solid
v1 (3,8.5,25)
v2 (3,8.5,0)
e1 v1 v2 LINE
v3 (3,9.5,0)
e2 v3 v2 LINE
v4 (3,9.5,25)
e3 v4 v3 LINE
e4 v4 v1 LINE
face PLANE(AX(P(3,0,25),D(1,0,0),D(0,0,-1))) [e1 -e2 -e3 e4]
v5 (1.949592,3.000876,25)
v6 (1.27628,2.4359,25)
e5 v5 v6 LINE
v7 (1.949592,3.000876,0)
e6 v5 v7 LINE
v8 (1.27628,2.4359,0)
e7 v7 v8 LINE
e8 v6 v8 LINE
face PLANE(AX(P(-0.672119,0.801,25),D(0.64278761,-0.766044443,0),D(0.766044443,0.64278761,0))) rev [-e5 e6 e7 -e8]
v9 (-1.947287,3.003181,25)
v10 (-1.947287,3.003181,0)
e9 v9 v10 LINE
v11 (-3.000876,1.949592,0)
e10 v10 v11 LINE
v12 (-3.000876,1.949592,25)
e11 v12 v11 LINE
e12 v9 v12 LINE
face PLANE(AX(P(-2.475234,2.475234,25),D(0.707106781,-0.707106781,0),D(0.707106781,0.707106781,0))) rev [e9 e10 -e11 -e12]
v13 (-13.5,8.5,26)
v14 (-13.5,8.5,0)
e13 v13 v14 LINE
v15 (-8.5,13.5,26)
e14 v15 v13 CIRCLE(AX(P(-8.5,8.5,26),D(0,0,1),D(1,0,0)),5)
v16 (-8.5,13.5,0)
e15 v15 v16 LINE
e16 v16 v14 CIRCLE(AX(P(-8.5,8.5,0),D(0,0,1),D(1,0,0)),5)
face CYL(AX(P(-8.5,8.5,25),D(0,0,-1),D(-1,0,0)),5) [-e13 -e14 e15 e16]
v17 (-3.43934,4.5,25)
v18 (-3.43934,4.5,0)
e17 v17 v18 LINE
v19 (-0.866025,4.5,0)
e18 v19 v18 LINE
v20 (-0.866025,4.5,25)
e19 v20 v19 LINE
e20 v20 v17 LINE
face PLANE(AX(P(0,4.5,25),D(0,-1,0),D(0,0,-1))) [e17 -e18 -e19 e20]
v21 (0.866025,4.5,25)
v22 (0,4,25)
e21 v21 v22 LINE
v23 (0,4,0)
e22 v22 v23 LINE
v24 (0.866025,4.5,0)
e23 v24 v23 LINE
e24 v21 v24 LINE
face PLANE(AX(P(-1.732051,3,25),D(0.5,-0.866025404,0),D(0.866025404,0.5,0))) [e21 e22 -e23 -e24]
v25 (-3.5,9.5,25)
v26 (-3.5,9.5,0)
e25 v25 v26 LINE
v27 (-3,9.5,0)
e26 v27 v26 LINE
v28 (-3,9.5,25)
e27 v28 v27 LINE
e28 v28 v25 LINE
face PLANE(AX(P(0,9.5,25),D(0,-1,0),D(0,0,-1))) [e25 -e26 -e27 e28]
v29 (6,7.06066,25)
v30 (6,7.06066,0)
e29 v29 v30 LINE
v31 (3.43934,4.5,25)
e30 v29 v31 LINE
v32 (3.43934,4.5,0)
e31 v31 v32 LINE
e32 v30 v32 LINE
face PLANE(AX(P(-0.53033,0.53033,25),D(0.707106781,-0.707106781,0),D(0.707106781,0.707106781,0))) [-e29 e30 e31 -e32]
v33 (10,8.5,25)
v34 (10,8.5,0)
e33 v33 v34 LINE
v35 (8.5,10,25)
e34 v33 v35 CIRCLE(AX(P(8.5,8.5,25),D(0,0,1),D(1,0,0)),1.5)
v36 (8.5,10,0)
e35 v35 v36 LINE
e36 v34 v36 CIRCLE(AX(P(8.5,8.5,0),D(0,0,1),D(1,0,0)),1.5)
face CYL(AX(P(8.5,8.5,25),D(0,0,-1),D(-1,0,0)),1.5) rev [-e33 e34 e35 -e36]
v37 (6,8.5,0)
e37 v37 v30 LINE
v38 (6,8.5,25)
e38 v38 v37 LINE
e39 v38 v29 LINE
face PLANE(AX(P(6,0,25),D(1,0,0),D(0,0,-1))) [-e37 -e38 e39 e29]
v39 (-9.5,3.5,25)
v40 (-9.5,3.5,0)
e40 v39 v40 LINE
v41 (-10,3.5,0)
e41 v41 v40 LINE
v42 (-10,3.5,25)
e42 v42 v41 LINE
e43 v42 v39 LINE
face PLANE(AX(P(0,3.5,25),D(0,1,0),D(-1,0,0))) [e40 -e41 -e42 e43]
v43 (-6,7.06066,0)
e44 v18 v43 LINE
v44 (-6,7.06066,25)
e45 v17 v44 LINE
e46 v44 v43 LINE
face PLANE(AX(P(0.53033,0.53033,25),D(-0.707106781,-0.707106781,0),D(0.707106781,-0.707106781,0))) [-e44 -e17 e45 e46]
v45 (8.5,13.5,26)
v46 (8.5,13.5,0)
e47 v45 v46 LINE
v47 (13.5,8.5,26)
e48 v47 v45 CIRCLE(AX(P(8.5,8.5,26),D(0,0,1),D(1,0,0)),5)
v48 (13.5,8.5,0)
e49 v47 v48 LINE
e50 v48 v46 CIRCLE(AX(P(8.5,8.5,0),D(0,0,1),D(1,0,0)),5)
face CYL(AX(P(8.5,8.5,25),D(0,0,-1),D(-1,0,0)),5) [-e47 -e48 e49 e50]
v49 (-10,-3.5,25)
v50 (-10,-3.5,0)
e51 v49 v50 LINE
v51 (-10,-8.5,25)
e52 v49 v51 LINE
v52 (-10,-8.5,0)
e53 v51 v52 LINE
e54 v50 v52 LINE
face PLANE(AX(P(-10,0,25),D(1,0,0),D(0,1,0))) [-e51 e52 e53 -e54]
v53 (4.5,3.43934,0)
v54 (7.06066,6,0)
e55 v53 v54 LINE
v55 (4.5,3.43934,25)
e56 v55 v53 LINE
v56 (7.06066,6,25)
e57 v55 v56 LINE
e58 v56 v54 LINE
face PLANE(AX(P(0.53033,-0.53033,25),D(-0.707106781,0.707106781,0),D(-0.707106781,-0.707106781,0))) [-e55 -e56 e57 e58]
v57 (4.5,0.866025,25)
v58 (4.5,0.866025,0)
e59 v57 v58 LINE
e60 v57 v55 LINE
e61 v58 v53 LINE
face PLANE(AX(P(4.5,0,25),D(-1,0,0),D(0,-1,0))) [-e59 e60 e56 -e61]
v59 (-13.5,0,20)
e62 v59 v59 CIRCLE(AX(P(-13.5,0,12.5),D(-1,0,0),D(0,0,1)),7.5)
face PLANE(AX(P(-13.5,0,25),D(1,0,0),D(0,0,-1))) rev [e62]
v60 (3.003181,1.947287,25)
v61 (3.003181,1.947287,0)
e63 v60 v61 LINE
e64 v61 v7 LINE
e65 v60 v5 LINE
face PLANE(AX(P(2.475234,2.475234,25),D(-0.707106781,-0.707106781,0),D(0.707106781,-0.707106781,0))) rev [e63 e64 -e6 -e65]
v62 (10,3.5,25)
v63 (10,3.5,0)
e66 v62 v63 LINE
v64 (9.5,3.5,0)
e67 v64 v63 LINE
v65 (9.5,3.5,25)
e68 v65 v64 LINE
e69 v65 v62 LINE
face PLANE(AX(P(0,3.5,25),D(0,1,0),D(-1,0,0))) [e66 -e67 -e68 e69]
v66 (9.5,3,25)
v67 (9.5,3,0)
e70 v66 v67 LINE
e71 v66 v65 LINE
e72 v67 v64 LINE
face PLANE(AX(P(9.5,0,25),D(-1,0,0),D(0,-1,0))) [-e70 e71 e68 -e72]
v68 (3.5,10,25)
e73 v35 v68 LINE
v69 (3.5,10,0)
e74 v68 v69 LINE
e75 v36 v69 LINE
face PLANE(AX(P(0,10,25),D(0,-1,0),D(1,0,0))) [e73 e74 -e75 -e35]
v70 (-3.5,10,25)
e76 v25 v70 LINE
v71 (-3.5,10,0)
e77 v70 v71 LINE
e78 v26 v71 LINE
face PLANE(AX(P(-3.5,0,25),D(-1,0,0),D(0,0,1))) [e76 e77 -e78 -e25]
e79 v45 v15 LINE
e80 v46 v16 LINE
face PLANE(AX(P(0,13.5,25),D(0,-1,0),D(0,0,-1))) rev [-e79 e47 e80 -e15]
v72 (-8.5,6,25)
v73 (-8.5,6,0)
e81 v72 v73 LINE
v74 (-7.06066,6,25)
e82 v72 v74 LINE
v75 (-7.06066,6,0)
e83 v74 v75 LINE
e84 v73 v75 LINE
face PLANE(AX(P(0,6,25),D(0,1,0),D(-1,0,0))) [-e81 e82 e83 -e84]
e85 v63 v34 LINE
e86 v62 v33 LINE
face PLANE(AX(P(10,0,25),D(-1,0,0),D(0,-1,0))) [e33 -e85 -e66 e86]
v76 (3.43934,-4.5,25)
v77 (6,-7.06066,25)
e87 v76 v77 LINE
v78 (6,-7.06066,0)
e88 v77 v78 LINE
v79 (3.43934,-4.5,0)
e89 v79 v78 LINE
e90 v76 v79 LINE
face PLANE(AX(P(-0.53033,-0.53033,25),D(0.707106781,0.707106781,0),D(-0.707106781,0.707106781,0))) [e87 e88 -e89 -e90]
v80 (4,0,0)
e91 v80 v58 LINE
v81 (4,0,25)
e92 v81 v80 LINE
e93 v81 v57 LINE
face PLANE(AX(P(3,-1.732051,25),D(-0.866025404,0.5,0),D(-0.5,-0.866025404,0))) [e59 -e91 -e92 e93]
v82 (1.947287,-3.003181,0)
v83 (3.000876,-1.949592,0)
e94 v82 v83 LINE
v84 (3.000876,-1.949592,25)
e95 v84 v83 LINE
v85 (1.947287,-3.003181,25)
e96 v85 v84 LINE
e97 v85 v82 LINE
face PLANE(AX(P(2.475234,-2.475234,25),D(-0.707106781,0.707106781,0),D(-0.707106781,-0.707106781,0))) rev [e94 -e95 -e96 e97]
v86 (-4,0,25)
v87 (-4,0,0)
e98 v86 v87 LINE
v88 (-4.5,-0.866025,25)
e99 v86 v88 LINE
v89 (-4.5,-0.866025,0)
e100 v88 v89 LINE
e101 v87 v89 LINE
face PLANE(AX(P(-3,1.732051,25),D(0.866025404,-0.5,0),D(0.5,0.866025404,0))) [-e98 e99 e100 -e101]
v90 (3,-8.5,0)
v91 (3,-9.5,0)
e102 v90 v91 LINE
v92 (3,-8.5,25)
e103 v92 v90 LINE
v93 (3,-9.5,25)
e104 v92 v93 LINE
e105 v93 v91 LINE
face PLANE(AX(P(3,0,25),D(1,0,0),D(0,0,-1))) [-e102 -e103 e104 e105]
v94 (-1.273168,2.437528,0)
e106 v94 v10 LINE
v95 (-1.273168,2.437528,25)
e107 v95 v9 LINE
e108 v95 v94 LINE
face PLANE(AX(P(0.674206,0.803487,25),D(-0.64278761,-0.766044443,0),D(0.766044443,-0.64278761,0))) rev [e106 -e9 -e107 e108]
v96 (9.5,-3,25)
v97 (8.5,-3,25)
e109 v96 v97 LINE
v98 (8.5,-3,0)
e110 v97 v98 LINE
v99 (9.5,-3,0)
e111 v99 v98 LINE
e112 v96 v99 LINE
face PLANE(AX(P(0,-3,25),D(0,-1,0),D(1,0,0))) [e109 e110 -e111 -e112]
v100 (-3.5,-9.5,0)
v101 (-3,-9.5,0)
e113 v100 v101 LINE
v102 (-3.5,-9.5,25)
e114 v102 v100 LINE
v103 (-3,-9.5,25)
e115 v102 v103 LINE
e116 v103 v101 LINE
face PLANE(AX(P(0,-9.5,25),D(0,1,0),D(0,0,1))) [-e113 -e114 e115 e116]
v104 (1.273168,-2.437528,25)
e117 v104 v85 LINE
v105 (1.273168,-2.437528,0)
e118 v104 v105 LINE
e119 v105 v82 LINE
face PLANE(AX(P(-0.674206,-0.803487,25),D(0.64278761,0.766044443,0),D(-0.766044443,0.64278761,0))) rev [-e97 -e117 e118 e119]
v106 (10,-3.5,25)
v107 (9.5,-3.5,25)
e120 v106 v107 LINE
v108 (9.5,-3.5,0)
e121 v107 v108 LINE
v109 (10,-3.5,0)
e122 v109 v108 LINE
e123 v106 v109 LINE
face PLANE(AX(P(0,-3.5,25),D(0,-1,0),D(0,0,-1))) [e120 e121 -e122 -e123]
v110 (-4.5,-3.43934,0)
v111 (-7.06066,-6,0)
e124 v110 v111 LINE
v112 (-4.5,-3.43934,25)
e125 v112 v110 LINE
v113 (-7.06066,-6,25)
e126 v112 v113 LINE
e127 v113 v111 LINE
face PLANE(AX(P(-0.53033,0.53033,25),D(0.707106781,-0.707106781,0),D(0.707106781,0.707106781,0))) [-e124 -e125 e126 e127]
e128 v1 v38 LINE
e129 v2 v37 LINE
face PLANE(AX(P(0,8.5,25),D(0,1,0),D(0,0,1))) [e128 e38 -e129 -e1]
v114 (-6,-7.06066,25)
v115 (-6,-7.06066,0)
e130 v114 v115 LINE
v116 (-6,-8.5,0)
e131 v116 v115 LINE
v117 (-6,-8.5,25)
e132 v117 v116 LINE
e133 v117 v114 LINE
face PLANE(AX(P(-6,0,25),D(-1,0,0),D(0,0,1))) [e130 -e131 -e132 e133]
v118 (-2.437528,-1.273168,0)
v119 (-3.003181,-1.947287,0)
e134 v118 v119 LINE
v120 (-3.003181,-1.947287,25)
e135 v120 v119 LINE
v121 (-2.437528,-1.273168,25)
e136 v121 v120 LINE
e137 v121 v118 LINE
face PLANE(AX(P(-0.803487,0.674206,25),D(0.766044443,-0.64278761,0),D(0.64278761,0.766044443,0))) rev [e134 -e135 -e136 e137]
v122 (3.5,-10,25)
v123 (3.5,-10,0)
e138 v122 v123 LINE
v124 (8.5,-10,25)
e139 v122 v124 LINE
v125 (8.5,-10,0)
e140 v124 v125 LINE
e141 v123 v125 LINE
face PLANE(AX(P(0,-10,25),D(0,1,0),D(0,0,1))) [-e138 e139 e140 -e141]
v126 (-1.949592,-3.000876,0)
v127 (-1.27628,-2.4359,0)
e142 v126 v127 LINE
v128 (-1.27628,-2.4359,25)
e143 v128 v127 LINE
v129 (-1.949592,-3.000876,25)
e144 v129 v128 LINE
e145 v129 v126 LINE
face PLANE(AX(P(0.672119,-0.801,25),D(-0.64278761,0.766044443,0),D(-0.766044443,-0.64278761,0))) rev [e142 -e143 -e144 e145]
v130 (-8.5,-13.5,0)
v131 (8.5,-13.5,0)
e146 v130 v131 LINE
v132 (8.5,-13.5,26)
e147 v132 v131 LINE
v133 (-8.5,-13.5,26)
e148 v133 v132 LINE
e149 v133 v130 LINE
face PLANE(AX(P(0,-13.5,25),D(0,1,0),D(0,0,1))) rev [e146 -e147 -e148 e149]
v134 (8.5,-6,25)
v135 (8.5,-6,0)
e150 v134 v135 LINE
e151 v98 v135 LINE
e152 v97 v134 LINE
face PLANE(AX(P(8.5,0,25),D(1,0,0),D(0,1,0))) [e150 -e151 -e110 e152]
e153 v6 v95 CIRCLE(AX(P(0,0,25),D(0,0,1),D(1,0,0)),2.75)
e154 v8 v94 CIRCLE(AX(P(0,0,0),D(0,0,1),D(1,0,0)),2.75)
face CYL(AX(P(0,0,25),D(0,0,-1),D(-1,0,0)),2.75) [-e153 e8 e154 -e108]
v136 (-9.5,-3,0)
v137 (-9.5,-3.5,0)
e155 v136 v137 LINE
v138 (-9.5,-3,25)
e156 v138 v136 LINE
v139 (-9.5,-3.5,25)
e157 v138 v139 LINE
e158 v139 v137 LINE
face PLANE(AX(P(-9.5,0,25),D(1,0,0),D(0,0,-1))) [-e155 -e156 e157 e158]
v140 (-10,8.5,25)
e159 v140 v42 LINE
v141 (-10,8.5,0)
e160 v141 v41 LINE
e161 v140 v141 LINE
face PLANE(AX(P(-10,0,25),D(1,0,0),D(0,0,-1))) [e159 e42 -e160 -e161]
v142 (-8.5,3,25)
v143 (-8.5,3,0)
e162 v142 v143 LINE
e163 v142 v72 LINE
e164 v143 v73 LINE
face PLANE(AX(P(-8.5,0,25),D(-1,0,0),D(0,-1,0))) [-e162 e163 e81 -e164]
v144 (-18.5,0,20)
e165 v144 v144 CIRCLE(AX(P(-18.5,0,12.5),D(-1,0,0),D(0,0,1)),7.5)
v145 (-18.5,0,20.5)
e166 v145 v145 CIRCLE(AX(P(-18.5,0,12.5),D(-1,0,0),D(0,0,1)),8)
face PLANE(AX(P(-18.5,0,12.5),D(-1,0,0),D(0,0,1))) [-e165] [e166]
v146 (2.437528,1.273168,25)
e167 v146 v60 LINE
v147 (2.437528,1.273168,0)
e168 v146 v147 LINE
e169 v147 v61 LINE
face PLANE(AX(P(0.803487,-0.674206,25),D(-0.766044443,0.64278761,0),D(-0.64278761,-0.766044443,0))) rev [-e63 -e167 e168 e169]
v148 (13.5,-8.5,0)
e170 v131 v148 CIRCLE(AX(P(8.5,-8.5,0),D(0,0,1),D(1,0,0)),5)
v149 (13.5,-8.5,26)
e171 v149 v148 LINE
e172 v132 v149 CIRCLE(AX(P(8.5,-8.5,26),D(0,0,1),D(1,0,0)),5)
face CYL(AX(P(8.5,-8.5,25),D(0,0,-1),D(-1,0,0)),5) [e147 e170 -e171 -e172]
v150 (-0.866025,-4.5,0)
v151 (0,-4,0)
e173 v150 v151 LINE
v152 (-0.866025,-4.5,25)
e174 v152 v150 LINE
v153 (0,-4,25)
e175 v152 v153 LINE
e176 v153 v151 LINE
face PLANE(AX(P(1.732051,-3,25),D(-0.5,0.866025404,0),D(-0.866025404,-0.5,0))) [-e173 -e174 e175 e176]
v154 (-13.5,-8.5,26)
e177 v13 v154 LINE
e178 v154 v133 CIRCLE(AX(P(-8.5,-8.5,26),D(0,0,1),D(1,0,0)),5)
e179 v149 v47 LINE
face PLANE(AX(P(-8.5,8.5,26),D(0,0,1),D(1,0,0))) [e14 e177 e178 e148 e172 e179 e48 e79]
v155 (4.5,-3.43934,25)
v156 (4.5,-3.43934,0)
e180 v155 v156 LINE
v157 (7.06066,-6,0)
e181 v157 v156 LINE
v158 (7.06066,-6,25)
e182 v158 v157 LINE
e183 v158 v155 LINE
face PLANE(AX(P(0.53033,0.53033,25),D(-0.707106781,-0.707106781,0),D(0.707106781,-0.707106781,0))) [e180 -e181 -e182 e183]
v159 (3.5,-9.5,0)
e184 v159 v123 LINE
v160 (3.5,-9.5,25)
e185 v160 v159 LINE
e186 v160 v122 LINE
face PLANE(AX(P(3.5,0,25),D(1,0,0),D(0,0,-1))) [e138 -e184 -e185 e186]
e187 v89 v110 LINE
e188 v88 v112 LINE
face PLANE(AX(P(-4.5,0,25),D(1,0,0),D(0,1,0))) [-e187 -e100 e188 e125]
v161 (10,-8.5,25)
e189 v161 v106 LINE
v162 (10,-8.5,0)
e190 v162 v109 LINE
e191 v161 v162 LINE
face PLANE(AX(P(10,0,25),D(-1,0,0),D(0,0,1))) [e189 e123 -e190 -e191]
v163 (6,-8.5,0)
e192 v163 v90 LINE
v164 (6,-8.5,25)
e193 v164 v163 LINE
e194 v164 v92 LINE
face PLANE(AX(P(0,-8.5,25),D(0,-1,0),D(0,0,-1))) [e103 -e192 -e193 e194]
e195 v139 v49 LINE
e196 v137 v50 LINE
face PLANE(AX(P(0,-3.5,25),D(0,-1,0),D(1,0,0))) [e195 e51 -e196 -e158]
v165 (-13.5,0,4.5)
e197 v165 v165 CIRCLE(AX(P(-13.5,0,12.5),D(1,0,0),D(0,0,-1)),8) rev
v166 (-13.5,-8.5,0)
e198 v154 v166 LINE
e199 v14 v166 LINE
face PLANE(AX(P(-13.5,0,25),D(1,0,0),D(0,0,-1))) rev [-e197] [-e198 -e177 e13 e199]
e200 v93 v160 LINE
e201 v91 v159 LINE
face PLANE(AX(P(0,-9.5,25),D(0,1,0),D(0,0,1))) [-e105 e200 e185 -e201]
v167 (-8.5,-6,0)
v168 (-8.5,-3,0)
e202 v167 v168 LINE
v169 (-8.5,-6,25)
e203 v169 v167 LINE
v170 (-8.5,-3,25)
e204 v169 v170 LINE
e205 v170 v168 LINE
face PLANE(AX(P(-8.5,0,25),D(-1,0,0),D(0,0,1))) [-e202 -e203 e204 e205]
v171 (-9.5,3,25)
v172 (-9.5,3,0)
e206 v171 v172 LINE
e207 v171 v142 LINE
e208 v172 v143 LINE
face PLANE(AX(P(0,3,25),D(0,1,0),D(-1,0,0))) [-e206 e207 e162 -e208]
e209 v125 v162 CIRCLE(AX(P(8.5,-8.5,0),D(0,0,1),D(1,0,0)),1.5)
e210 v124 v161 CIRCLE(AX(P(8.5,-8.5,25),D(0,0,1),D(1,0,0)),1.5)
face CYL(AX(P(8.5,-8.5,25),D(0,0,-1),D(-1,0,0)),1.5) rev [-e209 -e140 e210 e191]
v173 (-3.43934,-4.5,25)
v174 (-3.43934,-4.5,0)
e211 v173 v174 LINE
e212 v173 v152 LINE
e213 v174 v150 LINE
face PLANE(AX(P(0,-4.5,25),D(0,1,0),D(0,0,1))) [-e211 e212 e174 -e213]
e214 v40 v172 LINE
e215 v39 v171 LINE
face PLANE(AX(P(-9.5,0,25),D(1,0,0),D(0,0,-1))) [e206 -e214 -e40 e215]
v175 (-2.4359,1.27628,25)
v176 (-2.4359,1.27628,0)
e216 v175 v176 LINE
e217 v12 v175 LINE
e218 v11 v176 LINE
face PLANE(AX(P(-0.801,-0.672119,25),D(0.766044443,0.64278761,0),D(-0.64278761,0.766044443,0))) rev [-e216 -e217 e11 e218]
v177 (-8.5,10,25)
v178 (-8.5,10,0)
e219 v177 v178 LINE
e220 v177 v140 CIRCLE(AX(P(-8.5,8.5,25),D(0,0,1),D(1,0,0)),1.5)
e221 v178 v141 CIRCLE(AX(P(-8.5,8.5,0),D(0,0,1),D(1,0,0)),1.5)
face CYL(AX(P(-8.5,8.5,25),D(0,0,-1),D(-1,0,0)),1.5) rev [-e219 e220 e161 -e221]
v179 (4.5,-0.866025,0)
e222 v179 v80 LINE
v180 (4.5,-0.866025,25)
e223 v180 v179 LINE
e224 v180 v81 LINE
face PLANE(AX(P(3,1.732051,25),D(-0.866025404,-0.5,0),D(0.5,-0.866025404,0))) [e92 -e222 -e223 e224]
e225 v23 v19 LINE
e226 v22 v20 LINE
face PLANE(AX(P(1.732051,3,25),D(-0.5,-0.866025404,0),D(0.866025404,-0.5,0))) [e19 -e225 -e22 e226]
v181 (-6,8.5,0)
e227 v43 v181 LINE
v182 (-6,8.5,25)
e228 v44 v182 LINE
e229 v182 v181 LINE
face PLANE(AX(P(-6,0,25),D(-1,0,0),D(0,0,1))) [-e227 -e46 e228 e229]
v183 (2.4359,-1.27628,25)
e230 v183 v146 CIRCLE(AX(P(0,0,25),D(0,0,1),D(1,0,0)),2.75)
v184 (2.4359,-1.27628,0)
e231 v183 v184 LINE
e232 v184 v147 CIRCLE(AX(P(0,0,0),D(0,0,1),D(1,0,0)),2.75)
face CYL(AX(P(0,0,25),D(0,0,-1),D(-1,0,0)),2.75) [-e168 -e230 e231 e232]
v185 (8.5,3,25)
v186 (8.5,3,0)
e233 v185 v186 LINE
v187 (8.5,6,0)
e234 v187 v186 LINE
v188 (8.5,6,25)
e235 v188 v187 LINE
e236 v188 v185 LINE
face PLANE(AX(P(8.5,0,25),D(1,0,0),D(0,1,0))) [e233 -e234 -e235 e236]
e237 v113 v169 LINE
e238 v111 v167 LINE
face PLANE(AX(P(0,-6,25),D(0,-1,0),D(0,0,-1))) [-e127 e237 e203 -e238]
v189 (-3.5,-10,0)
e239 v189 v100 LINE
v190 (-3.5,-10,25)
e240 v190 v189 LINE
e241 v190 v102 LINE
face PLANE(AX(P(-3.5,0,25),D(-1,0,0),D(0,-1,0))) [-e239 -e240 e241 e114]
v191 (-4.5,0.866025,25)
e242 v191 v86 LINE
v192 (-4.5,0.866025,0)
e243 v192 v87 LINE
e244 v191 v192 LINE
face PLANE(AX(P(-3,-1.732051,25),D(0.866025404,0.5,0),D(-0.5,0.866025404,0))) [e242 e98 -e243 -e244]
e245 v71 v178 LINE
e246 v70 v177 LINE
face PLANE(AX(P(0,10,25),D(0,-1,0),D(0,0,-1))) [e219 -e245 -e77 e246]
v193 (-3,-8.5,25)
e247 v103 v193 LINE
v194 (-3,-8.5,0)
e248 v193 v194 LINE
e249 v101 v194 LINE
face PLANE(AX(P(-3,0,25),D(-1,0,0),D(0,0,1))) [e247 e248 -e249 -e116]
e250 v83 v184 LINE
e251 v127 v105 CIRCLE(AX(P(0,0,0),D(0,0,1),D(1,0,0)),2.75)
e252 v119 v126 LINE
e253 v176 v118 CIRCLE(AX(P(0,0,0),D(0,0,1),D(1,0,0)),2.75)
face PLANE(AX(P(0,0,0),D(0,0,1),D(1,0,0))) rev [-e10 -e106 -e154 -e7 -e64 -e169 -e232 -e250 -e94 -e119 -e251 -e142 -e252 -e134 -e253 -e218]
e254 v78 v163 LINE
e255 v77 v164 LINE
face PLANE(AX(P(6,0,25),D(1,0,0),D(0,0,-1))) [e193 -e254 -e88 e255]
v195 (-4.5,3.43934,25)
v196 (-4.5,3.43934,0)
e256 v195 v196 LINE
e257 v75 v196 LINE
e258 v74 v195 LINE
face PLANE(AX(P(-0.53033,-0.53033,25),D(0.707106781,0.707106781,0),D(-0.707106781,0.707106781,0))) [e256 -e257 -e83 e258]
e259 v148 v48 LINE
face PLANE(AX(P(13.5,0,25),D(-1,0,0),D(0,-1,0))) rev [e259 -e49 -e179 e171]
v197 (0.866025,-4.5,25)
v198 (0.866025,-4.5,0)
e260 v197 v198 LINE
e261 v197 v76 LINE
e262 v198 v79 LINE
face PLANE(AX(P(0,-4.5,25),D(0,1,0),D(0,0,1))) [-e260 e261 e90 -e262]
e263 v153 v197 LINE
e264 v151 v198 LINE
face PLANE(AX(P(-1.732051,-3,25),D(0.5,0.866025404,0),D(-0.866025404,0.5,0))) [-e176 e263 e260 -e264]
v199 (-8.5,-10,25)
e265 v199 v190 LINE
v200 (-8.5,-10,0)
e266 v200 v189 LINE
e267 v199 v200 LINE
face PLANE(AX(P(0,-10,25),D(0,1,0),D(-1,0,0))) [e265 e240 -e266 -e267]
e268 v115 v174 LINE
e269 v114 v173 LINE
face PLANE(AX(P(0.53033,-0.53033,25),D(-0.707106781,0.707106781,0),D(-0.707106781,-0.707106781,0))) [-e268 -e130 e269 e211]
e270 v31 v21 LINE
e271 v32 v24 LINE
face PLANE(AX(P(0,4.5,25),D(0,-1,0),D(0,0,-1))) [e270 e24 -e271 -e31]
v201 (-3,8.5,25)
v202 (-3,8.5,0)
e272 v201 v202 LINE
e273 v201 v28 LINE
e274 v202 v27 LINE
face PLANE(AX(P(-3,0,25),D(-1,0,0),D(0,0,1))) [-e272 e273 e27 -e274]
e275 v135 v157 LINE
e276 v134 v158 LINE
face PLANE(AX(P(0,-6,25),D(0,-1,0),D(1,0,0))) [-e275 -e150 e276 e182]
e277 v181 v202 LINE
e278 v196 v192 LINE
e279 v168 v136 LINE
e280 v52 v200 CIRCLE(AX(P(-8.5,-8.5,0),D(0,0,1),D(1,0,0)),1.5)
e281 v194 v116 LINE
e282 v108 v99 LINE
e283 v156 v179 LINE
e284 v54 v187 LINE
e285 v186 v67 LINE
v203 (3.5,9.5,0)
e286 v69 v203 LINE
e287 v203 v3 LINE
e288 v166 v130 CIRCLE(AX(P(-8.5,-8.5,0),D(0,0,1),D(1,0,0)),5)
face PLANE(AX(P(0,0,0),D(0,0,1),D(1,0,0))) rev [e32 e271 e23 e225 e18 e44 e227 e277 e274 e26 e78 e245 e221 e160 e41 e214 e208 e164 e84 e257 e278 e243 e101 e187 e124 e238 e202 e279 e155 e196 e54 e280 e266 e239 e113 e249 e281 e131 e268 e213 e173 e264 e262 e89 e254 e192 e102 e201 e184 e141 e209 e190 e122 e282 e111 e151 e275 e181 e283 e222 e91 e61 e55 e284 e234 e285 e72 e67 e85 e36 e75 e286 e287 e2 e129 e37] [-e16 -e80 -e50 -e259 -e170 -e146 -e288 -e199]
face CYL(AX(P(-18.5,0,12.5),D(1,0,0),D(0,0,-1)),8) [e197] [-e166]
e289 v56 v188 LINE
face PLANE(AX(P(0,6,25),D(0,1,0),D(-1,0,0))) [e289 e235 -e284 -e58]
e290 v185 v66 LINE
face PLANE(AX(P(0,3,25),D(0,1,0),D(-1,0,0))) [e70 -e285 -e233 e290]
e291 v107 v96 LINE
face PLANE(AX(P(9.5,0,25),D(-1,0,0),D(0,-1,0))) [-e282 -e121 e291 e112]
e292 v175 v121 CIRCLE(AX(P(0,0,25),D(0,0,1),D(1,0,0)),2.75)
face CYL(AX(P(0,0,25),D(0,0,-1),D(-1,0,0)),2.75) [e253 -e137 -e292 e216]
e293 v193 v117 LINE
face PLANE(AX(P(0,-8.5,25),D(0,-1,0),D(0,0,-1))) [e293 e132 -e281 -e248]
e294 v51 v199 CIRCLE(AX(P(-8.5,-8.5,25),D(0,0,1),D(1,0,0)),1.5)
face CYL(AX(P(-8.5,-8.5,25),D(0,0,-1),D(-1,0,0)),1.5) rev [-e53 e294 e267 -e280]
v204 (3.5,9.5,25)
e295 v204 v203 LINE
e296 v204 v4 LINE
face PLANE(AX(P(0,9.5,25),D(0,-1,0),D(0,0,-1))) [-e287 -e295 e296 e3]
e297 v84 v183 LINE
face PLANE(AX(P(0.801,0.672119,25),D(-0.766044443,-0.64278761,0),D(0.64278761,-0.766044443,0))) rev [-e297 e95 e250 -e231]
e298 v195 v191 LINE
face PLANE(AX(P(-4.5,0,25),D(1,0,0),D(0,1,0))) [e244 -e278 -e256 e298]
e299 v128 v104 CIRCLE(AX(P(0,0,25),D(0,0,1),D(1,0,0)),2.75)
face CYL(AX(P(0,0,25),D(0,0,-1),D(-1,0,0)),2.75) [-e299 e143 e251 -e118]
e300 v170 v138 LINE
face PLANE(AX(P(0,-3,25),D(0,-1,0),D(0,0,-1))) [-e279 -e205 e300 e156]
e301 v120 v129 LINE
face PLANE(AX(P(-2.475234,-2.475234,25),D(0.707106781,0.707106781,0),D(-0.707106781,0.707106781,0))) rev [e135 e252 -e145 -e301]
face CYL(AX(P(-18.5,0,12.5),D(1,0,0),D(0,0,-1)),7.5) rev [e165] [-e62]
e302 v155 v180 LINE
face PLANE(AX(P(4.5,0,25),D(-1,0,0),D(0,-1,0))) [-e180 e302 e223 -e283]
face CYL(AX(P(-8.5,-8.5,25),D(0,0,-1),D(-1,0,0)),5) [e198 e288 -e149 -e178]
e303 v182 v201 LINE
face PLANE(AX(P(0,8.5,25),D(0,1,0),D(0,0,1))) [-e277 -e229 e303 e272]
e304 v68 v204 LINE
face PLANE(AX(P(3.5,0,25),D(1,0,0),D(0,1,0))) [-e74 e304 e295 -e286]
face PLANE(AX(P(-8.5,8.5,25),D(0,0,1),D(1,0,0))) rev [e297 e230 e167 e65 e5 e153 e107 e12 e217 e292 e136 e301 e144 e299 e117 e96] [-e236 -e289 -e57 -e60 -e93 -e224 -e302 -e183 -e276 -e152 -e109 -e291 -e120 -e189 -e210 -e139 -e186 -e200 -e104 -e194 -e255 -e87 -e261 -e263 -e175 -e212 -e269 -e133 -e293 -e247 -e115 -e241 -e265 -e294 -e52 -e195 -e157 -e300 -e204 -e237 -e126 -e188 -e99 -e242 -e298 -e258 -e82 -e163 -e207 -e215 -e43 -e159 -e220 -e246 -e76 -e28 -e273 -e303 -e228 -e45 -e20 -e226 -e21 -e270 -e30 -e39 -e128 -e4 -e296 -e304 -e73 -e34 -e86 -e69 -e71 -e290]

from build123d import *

# Parameters (mm, degrees)
BOSS_EXTRU_5_DEPTH = 25
ESQUISSE7_R        = 8
ESQUISSE7_R_2      = 7.5
BOSS_EXTRU_7_DEPTH = 5
BOSS_EXTRU_6_DEPTH = 1


# Read off the part's stored shape, not the designer's step: Boss.-Extru.5
with BuildPart() as part:
    # Boss.-Extru.5 outline → Boss.-Extru.5 (new body)
    # profile 1 of 2: a face of its own
    with BuildSketch(Plane.XY):
        with BuildLine():
            Line((-8.5, -13.5), (8.5, -13.5))
            ThreePointArc((8.5, -13.5), (12.035533906, -12.035533906), (13.5, -8.5))
            Line((13.5, -8.5), (13.5, 8.5))
            ThreePointArc((13.5, 8.5), (12.035533906, 12.035533906), (8.5, 13.5))
            Line((8.5, 13.5), (-8.5, 13.5))
            ThreePointArc((-8.5, 13.5), (-12.035533906, 12.035533906), (-13.5, 8.5))
            Line((-13.5, 8.5), (-13.5, -8.5))
            ThreePointArc((-13.5, -8.5), (-12.035533906, -12.035533906), (-8.5, -13.5))
        make_face()
        with BuildLine():
            Line((-10, 3.5), (-10, 8.5))
            ThreePointArc((-10, 8.5), (-9.560660172, 9.560660172), (-8.5, 10))
            Line((-8.5, 10), (-3.5, 10))
            Line((-3.5, 10), (-3.5, 9.5))
            Line((-3.5, 9.5), (-3, 9.5))
            Line((-3, 9.5), (-3, 8.5))
            Line((-3, 8.5), (-6, 8.5))
            Line((-6, 8.5), (-6, 7.060660172))
            Line((-6, 7.060660172), (-3.439339828, 4.5))
            Line((-3.439339828, 4.5), (-0.866025404, 4.5))
            Line((-0.866025404, 4.5), (0, 4))
            Line((0, 4), (0.866025404, 4.5))
            Line((0.866025404, 4.5), (3.439339828, 4.5))
            Line((3.439339828, 4.5), (6, 7.060660172))
            Line((6, 7.060660172), (6, 8.5))
            Line((6, 8.5), (3, 8.5))
            Line((3, 8.5), (3, 9.5))
            Line((3, 9.5), (3.5, 9.5))
            Line((3.5, 9.5), (3.5, 10))
            Line((3.5, 10), (8.5, 10))
            ThreePointArc((8.5, 10), (9.560660172, 9.560660172), (10, 8.5))
            Line((10, 8.5), (10, 3.5))
            Line((10, 3.5), (9.5, 3.5))
            Line((9.5, 3.5), (9.5, 3))
            Line((9.5, 3), (8.5, 3))
            Line((8.5, 3), (8.5, 6))
            Line((8.5, 6), (7.060660172, 6))
            Line((7.060660172, 6), (4.5, 3.439339828))
            Line((4.5, 3.439339828), (4.5, 0.866025404))
            Line((4.5, 0.866025404), (4, 0))
            Line((4, 0), (4.5, -0.866025404))
            Line((4.5, -0.866025404), (4.5, -3.439339828))
            Line((4.5, -3.439339828), (7.060660172, -6))
            Line((7.060660172, -6), (8.5, -6))
            Line((8.5, -6), (8.5, -3))
            Line((8.5, -3), (9.5, -3))
            Line((9.5, -3), (9.5, -3.5))
            Line((9.5, -3.5), (10, -3.5))
            Line((10, -3.5), (10, -8.5))
            ThreePointArc((10, -8.5), (9.560660172, -9.560660172), (8.5, -10))
            Line((8.5, -10), (3.5, -10))
            Line((3.5, -10), (3.5, -9.5))
            Line((3.5, -9.5), (3, -9.5))
            Line((3, -9.5), (3, -8.5))
            Line((3, -8.5), (6, -8.5))
            Line((6, -8.5), (6, -7.060660172))
            Line((6, -7.060660172), (3.439339828, -4.5))
            Line((3.439339828, -4.5), (0.866025404, -4.5))
            Line((0.866025404, -4.5), (0, -4))
            Line((0, -4), (-0.866025404, -4.5))
            Line((-0.866025404, -4.5), (-3.439339828, -4.5))
            Line((-3.439339828, -4.5), (-6, -7.060660172))
            Line((-6, -7.060660172), (-6, -8.5))
            Line((-6, -8.5), (-3, -8.5))
            Line((-3, -8.5), (-3, -9.5))
            Line((-3, -9.5), (-3.5, -9.5))
            Line((-3.5, -9.5), (-3.5, -10))
            Line((-3.5, -10), (-8.5, -10))
            ThreePointArc((-8.5, -10), (-9.560660172, -9.560660172), (-10, -8.5))
            Line((-10, -8.5), (-10, -3.5))
            Line((-10, -3.5), (-9.5, -3.5))
            Line((-9.5, -3.5), (-9.5, -3))
            Line((-9.5, -3), (-8.5, -3))
            Line((-8.5, -3), (-8.5, -6))
            Line((-8.5, -6), (-7.060660172, -6))
            Line((-7.060660172, -6), (-4.5, -3.439339828))
            Line((-4.5, -3.439339828), (-4.5, -0.866025404))
            Line((-4.5, -0.866025404), (-4, 0))
            Line((-4, 0), (-4.5, 0.866025404))
            Line((-4.5, 0.866025404), (-4.5, 3.439339828))
            Line((-4.5, 3.439339828), (-7.060660172, 6))
            Line((-7.060660172, 6), (-8.5, 6))
            Line((-8.5, 6), (-8.5, 3))
            Line((-8.5, 3), (-9.5, 3))
            Line((-9.5, 3), (-9.5, 3.5))
            Line((-9.5, 3.5), (-10, 3.5))
        make_face(mode=Mode.SUBTRACT)
    # profile 2 of 2: a face of its own
    with BuildSketch(Plane.XY):
        with BuildLine():
            Line((1.949592103, 3.000876196), (1.276279893, 2.435900169))
            ThreePointArc((1.276279893, 2.435900169), (0.001756003, 2.749999439), (-1.273167982, 2.43752811))
            Line((-1.273167982, 2.43752811), (-1.947287092, 3.003181207))
            Line((-1.947287092, 3.003181207), (-3.000876196, 1.949592103))
            Line((-3.000876196, 1.949592103), (-2.435900169, 1.276279893))
            ThreePointArc((-2.435900169, 1.276279893), (-2.749999439, 0.001756003), (-2.43752811, -1.273167982))
            Line((-2.43752811, -1.273167982), (-3.003181207, -1.947287092))
            Line((-3.003181207, -1.947287092), (-1.949592103, -3.000876196))
            Line((-1.949592103, -3.000876196), (-1.276279893, -2.435900169))
            ThreePointArc((-1.276279893, -2.435900169), (-0.001756003, -2.749999439), (1.273167982, -2.43752811))
            Line((1.273167982, -2.43752811), (1.947287092, -3.003181207))
            Line((1.947287092, -3.003181207), (3.000876196, -1.949592103))
            Line((3.000876196, -1.949592103), (2.435900169, -1.276279893))
            ThreePointArc((2.435900169, -1.276279893), (2.749999439, -0.001756003), (2.43752811, 1.273167982))
            Line((2.43752811, 1.273167982), (3.003181207, 1.947287092))
            Line((3.003181207, 1.947287092), (1.949592103, 3.000876196))
        make_face()
    extrude(amount=BOSS_EXTRU_5_DEPTH)

    # Esquisse7 → Boss.-Extru.7 (add)
    with BuildSketch(Plane.ZY.offset(13.5)):
        with Locations(Location((12.5, 0, 0), (0, 0, 180))):
            Circle(ESQUISSE7_R)
        with Locations((12.5, 0)):
            Circle(ESQUISSE7_R_2, mode=Mode.SUBTRACT)
    extrude(amount=BOSS_EXTRU_7_DEPTH)

    # Esquisse6 → Boss.-Extru.6 (add)
    with BuildSketch(Plane.XY.offset(25)):
        with BuildLine():
            Line((-13.5, 8.5), (-13.5, -8.5))
            ThreePointArc((-13.5, -8.5), (-12.035533906, -12.035533906), (-8.5, -13.5))
            Line((-8.5, -13.5), (8.5, -13.5))
            ThreePointArc((8.5, -13.5), (12.035533906, -12.035533906), (13.5, -8.5))
            Line((13.5, -8.5), (13.5, 8.5))
            ThreePointArc((13.5, 8.5), (12.035533906, 12.035533906), (8.5, 13.5))
            Line((8.5, 13.5), (-8.5, 13.5))
            ThreePointArc((-8.5, 13.5), (-12.035533906, 12.035533906), (-13.5, 8.5))
        make_face()
    extrude(amount=BOSS_EXTRU_6_DEPTH)


solid = part.part
